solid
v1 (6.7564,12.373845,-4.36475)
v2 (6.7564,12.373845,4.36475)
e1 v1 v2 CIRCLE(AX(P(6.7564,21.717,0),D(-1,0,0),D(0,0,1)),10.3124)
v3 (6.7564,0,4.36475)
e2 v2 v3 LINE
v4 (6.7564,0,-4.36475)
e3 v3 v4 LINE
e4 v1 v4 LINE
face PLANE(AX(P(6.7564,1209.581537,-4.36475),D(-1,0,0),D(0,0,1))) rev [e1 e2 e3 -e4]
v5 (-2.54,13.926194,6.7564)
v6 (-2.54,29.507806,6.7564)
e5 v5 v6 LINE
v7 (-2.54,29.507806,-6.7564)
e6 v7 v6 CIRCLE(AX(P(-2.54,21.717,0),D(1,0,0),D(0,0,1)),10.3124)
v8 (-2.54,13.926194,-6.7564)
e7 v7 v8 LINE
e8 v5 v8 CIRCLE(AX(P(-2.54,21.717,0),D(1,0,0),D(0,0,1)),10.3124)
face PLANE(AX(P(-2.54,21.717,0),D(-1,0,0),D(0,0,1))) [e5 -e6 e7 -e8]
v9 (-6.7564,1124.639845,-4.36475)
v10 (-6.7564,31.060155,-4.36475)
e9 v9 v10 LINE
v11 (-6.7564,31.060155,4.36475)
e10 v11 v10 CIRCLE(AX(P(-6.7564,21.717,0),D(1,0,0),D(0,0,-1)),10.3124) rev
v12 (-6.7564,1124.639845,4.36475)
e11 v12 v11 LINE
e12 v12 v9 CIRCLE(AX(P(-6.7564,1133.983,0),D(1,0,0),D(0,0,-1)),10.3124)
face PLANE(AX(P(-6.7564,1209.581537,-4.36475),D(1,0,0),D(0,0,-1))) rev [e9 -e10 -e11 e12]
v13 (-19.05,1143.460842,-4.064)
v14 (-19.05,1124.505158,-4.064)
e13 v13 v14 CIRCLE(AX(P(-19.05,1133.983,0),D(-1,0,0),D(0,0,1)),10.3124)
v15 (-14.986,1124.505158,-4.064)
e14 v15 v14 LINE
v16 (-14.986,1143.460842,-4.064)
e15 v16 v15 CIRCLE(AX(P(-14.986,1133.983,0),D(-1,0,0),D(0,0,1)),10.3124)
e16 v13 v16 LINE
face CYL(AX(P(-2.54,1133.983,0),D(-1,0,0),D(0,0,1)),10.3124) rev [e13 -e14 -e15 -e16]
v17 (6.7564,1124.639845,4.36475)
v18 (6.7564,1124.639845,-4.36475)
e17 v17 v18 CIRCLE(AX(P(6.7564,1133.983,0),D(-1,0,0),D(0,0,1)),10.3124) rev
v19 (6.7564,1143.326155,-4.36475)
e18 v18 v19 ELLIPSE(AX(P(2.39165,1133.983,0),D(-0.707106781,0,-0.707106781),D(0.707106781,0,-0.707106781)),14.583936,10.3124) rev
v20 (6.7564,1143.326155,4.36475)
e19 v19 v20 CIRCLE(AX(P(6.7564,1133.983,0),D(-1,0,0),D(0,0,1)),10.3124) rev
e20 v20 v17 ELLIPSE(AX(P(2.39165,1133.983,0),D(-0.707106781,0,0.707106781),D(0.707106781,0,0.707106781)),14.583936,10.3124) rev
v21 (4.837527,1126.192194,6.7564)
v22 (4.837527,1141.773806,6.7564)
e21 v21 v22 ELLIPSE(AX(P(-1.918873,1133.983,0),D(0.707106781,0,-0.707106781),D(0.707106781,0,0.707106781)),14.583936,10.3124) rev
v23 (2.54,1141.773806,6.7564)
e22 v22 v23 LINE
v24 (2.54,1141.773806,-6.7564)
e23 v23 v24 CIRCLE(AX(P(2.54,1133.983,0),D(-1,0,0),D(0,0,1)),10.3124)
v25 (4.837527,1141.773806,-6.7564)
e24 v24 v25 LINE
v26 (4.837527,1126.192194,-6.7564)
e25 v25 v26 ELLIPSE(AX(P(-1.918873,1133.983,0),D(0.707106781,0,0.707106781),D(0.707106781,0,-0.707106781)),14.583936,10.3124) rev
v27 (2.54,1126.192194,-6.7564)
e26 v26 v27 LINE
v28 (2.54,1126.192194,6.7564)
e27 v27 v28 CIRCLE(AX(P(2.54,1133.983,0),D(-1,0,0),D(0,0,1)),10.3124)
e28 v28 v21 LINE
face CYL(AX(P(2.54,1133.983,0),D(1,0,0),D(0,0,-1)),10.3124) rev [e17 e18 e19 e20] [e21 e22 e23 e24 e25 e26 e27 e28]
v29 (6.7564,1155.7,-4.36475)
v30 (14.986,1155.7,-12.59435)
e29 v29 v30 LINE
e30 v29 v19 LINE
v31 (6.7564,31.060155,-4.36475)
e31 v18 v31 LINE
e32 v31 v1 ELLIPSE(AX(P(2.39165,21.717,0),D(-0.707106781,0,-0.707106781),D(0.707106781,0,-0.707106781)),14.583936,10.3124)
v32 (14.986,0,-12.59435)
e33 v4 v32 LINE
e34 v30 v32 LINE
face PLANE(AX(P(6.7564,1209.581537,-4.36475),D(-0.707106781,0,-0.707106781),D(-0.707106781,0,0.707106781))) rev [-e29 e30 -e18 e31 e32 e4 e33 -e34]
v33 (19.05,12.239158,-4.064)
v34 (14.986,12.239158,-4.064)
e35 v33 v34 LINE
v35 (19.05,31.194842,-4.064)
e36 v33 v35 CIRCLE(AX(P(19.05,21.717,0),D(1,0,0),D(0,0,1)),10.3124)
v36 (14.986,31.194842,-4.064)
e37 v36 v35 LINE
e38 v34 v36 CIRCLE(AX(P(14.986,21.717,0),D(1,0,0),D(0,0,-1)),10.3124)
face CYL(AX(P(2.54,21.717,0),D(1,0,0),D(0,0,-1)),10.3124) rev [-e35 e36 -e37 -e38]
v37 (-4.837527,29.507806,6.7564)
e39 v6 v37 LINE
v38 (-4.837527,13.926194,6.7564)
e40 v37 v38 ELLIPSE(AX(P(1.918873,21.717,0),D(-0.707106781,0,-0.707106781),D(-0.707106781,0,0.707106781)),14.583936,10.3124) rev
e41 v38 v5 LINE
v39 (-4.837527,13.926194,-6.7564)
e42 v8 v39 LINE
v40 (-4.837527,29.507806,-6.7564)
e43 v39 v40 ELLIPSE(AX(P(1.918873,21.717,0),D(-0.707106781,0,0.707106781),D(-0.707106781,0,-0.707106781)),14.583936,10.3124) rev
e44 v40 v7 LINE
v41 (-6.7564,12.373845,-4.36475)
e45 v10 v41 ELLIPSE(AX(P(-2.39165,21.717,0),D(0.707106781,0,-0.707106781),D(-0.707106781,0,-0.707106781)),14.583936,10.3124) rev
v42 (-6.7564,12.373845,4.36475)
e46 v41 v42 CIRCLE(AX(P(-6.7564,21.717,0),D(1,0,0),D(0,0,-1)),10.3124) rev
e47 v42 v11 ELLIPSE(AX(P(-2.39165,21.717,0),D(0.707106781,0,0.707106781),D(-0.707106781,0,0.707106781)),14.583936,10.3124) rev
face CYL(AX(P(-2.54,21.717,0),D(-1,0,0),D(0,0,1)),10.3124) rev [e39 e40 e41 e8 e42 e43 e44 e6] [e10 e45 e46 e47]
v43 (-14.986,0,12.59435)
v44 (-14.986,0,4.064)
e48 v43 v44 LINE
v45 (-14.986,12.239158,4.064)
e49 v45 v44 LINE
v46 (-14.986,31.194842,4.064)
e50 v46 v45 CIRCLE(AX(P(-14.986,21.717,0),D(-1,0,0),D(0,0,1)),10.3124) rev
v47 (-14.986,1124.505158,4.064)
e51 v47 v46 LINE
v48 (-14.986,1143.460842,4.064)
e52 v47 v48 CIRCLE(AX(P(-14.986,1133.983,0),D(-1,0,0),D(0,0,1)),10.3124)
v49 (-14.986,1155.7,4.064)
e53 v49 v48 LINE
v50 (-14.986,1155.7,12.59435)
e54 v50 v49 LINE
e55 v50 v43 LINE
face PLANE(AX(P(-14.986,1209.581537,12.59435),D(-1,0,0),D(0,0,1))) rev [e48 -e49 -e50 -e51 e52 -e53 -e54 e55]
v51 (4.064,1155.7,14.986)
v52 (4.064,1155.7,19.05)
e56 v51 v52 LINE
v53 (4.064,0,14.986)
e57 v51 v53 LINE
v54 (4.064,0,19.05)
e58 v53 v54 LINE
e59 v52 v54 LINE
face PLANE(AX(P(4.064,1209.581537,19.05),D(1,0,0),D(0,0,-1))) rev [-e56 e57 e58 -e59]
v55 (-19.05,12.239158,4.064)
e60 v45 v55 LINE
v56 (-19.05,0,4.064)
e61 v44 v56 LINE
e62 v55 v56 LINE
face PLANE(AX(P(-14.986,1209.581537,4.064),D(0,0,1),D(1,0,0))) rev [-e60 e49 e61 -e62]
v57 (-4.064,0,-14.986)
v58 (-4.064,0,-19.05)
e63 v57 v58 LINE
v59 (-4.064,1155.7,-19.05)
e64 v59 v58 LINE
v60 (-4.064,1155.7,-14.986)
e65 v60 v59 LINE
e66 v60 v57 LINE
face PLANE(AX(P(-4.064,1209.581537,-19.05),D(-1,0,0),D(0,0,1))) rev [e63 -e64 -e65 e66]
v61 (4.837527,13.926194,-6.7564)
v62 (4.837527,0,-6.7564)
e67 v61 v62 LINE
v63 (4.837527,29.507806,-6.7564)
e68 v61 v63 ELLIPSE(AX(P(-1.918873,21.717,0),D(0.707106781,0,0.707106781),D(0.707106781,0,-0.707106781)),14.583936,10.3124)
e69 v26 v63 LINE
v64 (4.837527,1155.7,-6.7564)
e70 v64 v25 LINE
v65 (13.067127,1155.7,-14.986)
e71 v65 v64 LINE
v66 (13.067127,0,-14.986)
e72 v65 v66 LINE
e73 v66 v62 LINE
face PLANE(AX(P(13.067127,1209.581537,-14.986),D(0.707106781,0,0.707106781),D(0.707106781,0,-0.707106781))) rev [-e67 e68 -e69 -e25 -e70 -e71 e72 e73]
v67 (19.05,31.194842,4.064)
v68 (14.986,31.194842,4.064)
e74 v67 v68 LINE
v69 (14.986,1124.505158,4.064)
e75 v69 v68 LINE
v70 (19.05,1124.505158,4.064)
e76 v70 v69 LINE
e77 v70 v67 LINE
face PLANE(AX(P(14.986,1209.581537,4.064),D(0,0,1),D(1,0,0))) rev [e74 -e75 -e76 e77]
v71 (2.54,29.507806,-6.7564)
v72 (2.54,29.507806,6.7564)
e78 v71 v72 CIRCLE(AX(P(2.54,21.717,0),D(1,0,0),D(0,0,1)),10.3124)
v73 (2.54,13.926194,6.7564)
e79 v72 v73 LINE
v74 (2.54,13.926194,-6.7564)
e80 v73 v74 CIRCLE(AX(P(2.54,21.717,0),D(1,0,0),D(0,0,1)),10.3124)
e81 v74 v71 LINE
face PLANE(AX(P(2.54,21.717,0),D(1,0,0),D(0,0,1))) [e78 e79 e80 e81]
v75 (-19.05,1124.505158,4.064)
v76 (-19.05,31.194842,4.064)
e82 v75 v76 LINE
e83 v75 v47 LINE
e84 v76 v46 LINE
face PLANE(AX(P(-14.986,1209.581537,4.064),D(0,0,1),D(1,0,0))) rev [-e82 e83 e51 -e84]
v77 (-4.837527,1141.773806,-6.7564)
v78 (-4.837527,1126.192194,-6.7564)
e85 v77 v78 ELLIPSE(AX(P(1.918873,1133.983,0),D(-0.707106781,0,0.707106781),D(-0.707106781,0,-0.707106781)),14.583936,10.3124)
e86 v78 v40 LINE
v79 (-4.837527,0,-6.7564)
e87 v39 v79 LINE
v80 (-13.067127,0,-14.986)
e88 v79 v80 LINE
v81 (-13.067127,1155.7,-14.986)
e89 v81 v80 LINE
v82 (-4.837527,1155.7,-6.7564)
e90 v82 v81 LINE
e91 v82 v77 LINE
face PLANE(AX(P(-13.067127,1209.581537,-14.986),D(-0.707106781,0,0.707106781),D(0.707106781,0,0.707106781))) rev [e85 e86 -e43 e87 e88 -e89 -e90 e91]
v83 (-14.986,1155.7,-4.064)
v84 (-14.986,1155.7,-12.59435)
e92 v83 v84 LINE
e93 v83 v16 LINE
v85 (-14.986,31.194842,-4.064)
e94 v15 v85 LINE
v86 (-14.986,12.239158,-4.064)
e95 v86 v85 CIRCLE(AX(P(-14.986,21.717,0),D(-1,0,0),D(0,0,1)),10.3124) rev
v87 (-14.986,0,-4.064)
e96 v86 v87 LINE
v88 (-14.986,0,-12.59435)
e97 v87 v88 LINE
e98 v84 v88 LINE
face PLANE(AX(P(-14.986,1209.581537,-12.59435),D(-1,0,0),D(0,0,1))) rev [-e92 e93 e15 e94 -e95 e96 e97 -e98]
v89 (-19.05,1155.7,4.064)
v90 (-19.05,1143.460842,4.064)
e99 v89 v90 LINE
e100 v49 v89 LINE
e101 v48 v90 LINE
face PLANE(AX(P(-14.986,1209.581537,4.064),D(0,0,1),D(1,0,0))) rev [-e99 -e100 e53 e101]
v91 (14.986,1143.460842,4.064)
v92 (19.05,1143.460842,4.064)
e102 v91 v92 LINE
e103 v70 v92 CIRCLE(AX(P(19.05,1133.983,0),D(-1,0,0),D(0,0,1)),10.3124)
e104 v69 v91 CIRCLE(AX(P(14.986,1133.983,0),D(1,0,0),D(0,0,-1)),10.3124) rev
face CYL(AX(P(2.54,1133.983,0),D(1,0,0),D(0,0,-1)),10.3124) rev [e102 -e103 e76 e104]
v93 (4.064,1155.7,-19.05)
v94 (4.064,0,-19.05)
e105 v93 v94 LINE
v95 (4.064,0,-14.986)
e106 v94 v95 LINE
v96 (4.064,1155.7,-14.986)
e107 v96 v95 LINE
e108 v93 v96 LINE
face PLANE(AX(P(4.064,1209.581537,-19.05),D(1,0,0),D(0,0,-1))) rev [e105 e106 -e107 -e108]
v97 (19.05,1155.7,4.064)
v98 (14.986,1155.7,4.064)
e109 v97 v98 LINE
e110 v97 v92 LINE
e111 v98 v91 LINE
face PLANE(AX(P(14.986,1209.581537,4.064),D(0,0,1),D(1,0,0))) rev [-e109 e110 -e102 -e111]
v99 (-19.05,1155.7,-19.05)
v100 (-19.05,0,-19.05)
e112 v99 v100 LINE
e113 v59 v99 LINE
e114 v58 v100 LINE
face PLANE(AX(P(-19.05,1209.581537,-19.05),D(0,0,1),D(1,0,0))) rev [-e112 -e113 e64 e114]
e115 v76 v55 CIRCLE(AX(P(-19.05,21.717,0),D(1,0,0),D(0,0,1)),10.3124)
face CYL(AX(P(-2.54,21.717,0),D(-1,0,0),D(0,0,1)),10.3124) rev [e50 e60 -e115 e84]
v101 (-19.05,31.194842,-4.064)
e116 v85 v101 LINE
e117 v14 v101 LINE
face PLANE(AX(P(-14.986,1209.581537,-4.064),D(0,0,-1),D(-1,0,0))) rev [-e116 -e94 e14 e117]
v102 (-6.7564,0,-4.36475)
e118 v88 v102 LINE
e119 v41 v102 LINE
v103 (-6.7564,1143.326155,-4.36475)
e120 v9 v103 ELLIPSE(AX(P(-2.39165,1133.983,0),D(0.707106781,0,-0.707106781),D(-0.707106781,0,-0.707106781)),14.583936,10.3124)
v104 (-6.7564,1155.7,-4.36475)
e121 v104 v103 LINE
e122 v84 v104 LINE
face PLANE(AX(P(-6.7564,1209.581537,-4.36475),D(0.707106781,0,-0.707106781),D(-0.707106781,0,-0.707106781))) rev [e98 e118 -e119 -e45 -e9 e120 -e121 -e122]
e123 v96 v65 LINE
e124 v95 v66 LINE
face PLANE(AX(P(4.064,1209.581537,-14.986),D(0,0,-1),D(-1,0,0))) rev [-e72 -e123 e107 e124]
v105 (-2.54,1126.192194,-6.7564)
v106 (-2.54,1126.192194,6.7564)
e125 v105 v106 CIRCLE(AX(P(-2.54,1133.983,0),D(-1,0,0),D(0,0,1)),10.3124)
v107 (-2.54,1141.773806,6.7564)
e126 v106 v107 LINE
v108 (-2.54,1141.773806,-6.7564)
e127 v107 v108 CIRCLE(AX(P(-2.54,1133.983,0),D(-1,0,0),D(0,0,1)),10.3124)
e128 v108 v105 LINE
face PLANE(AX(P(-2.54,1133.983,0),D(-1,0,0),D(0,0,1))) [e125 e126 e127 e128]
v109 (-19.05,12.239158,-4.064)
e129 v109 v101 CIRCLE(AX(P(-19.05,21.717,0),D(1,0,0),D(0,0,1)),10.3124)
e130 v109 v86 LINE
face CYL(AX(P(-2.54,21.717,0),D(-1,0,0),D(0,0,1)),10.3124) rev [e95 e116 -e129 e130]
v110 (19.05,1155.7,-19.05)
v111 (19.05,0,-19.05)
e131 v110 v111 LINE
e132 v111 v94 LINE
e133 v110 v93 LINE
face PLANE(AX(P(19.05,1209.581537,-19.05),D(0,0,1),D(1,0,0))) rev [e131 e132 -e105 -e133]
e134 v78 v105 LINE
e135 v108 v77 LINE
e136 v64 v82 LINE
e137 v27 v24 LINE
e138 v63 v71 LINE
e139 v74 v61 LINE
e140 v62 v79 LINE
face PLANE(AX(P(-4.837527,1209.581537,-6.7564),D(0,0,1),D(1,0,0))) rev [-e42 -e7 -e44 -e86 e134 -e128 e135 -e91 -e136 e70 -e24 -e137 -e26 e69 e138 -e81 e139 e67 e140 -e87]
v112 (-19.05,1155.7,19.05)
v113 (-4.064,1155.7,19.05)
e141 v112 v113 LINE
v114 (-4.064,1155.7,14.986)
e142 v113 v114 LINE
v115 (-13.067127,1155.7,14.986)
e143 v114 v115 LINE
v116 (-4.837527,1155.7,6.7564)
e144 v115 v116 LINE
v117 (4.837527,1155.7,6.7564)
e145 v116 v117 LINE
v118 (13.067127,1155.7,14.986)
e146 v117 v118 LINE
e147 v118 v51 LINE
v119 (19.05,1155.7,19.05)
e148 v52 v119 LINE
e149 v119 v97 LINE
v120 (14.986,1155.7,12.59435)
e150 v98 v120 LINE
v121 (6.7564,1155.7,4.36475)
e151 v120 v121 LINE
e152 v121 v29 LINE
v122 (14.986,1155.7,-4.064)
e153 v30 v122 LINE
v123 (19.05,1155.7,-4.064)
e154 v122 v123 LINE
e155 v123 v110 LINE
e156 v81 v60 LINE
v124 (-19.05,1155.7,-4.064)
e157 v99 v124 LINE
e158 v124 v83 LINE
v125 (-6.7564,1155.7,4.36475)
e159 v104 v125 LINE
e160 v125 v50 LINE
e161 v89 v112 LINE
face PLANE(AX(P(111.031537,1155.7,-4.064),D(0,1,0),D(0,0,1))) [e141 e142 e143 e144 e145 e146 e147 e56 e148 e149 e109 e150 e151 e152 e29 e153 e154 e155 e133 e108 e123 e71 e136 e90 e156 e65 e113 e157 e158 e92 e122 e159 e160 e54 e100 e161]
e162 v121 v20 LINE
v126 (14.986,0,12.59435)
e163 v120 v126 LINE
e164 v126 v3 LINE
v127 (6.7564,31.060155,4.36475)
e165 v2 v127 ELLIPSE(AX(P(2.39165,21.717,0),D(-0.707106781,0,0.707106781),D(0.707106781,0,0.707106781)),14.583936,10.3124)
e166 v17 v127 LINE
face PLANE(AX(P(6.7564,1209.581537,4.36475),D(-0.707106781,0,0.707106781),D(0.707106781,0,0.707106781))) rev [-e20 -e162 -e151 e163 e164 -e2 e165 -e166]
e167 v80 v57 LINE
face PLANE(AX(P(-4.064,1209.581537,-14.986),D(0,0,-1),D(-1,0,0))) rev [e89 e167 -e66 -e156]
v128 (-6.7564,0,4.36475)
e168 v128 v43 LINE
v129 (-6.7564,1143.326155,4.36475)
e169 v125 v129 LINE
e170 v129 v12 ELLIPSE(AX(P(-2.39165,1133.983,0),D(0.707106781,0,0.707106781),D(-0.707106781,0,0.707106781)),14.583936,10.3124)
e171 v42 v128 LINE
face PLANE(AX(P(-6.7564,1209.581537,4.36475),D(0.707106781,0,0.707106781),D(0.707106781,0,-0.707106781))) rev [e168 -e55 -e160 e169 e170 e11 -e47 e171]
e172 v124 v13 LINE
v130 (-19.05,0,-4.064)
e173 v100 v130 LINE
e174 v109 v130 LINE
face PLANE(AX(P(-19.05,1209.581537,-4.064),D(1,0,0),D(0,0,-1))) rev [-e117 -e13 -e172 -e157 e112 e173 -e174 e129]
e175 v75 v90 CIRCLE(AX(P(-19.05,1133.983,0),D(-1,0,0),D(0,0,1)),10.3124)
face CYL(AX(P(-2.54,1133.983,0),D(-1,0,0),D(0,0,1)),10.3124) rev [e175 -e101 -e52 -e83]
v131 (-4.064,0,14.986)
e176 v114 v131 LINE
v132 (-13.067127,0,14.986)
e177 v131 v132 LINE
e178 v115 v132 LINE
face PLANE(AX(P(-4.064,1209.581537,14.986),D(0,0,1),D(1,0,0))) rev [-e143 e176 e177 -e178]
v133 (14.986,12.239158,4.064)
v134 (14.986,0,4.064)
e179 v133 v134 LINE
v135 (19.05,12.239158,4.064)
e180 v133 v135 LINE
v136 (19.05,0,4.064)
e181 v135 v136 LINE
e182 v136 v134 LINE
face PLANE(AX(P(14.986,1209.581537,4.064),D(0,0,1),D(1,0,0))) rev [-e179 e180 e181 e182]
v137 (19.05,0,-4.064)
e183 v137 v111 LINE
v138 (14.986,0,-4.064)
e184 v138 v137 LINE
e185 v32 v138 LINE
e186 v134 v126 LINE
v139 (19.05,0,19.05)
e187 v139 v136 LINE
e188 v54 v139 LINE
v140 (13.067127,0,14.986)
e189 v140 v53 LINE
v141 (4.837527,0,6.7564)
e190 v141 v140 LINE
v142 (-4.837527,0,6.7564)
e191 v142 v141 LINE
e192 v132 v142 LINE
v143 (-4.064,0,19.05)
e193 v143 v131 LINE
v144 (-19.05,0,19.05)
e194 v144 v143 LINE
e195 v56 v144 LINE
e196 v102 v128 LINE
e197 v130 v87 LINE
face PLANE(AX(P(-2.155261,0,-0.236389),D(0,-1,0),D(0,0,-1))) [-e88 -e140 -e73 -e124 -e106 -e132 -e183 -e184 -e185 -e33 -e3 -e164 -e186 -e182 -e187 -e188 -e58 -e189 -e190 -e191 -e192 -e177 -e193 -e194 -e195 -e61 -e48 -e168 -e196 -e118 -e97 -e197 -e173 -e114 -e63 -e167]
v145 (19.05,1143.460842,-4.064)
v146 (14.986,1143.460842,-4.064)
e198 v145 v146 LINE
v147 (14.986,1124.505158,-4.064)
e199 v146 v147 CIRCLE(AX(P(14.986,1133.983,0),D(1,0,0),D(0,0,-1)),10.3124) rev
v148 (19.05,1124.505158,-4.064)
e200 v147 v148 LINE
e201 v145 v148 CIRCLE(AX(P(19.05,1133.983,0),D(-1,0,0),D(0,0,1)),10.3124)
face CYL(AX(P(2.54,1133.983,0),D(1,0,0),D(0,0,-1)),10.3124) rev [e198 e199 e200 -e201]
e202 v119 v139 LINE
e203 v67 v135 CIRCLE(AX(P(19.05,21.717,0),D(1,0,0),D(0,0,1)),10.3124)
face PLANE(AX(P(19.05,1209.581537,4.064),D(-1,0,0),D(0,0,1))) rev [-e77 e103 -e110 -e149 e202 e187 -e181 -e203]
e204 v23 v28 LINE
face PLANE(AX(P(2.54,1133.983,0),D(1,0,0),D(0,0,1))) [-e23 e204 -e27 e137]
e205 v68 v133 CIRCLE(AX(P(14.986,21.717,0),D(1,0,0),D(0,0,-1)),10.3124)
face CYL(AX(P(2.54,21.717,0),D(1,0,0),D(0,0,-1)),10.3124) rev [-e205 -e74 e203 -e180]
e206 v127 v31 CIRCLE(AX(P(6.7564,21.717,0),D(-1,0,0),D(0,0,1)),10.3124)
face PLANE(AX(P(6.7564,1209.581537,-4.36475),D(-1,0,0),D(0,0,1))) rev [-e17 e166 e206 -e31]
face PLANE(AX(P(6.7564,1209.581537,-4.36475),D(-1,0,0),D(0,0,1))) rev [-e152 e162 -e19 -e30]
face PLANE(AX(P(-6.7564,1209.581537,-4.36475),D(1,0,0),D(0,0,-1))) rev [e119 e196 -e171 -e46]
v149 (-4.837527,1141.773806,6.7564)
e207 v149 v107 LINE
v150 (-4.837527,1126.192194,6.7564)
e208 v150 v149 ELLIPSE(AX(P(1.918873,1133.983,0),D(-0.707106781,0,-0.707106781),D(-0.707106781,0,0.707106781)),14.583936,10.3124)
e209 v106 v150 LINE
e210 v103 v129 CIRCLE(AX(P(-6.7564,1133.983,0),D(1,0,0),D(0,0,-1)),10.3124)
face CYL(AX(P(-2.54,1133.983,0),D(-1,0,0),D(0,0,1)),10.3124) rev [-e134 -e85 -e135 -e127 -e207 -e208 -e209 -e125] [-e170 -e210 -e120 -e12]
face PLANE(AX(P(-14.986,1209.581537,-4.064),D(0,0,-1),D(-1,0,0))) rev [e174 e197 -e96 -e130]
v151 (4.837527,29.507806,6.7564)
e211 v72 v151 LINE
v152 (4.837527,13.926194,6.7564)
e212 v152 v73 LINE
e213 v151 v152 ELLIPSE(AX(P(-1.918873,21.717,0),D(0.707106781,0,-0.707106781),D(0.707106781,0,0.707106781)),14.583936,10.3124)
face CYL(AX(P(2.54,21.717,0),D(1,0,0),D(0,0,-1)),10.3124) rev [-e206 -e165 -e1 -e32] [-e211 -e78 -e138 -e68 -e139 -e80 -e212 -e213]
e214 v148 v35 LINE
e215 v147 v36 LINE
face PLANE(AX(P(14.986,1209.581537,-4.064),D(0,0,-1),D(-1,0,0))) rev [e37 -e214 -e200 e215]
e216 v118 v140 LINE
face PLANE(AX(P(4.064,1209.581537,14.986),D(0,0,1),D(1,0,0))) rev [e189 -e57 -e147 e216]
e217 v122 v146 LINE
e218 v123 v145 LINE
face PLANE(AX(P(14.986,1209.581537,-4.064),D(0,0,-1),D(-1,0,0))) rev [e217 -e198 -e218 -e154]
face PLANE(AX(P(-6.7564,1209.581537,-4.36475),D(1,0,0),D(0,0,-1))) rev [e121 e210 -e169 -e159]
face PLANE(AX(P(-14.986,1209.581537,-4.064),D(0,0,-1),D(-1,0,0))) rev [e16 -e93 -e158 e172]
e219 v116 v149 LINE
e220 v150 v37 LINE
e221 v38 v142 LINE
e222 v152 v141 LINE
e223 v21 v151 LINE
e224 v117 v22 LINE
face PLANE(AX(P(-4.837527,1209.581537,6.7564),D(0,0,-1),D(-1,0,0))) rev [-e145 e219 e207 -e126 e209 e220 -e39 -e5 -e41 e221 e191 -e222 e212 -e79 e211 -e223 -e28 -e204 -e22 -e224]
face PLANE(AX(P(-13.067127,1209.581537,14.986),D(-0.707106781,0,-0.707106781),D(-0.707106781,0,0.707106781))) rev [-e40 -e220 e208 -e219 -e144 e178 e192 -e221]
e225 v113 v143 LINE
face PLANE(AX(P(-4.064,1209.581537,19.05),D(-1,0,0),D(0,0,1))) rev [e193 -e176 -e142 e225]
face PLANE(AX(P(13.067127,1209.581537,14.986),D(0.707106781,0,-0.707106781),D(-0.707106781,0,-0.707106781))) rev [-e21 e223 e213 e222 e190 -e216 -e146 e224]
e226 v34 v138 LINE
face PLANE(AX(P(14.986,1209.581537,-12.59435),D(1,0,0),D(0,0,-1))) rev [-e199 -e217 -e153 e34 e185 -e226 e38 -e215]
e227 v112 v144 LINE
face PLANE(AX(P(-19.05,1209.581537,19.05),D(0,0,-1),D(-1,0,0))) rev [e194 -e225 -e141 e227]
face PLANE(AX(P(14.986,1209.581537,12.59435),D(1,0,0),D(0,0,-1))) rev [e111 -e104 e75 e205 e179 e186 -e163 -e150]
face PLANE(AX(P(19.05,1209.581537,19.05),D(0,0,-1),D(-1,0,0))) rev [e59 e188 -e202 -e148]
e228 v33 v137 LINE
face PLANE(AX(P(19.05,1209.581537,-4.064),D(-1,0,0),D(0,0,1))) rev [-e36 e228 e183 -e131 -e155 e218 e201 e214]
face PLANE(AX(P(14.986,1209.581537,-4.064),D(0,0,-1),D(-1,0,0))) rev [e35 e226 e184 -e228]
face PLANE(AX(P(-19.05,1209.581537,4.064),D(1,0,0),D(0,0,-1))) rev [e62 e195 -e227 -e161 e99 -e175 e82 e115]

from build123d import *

# Parameters (mm, degrees)
EXTRUDE1_DEPTH          = 1155.7
SKETCH2_R               = 10.3124
EXTRUDE2_DEPTH          = 16.51
MIRROR2_COPY_1_SKETCH_R = 10.3124
MIRROR2_COPY_1_DEPTH    = 16.51


# Read off the part's stored shape, not the designer's step: 1515<1>
with BuildPart() as part:
    # Sketch1<2> → Extrude1 (new body)
    with BuildSketch(Plane(origin=(0, 0, 0), x_dir=(1, 0, 0), z_dir=(0, 1, 0))):
        Polygon((-6.7564, 4.364749804), (-6.7564, -4.364749804), (-14.986, -12.594349804), (-14.986, -4.064), (-19.05, -4.064), (-19.05, -19.05), (-4.064, -19.05), (-4.064, -14.986), (-13.067127258, -14.986), (-4.837527258, -6.7564), (4.837527258, -6.7564), (13.067127258, -14.986), (4.064, -14.986), (4.064, -19.05), (19.05, -19.05), (19.05, -4.064), (14.986, -4.064), (14.986, -12.594349804), (6.7564, -4.364749804), (6.7564, 4.364749804), (14.986, 12.594349804), (14.986, 4.064), (19.05, 4.064), (19.05, 19.05), (4.064, 19.05), (4.064, 14.986), (13.067127258, 14.986), (4.837527258, 6.7564), (-4.837527258, 6.7564), (-13.067127258, 14.986), (-4.064, 14.986), (-4.064, 19.05), (-19.05, 19.05), (-19.05, 4.064), (-14.986, 4.064), (-14.986, 12.594349804), align=None)
    extrude(amount=EXTRUDE1_DEPTH)

    # Sketch2 → Extrude2 (cut)
    with BuildSketch(Plane.ZY.offset(19.05)):
        with Locations(Location((0, 1133.983, 0), (0, 0, 310.932724574))):
            Circle(SKETCH2_R)
    extrude2 = extrude(amount=-EXTRUDE2_DEPTH, mode=Mode.SUBTRACT)

    # Mirror1: Extrude2 across plane
    add(extrude2.mirror(Plane(origin=(0, 0, 0), x_dir=(0, 0, 1), z_dir=(1, 0, 0))), mode=Mode.SUBTRACT)

    # Mirror2: Extrude2 across plane
    add(extrude2.mirror(Plane(origin=(0, 577.85, 0), x_dir=(0, 0, 1), z_dir=(0, -1, 0))), mode=Mode.SUBTRACT)

    # Mirror2 copy 1 sketch → Mirror2 copy 1 (cut)
    with BuildSketch(Plane(origin=(19.05, 1155.7, 0), x_dir=(0, 0, 1), z_dir=(1, 0, 0))):
        with Locations(Location((0, 1133.983, 0), (0, 0, 310.932724574))):
            Circle(MIRROR2_COPY_1_SKETCH_R)
    extrude(amount=-MIRROR2_COPY_1_DEPTH, mode=Mode.SUBTRACT)


solid = part.part
